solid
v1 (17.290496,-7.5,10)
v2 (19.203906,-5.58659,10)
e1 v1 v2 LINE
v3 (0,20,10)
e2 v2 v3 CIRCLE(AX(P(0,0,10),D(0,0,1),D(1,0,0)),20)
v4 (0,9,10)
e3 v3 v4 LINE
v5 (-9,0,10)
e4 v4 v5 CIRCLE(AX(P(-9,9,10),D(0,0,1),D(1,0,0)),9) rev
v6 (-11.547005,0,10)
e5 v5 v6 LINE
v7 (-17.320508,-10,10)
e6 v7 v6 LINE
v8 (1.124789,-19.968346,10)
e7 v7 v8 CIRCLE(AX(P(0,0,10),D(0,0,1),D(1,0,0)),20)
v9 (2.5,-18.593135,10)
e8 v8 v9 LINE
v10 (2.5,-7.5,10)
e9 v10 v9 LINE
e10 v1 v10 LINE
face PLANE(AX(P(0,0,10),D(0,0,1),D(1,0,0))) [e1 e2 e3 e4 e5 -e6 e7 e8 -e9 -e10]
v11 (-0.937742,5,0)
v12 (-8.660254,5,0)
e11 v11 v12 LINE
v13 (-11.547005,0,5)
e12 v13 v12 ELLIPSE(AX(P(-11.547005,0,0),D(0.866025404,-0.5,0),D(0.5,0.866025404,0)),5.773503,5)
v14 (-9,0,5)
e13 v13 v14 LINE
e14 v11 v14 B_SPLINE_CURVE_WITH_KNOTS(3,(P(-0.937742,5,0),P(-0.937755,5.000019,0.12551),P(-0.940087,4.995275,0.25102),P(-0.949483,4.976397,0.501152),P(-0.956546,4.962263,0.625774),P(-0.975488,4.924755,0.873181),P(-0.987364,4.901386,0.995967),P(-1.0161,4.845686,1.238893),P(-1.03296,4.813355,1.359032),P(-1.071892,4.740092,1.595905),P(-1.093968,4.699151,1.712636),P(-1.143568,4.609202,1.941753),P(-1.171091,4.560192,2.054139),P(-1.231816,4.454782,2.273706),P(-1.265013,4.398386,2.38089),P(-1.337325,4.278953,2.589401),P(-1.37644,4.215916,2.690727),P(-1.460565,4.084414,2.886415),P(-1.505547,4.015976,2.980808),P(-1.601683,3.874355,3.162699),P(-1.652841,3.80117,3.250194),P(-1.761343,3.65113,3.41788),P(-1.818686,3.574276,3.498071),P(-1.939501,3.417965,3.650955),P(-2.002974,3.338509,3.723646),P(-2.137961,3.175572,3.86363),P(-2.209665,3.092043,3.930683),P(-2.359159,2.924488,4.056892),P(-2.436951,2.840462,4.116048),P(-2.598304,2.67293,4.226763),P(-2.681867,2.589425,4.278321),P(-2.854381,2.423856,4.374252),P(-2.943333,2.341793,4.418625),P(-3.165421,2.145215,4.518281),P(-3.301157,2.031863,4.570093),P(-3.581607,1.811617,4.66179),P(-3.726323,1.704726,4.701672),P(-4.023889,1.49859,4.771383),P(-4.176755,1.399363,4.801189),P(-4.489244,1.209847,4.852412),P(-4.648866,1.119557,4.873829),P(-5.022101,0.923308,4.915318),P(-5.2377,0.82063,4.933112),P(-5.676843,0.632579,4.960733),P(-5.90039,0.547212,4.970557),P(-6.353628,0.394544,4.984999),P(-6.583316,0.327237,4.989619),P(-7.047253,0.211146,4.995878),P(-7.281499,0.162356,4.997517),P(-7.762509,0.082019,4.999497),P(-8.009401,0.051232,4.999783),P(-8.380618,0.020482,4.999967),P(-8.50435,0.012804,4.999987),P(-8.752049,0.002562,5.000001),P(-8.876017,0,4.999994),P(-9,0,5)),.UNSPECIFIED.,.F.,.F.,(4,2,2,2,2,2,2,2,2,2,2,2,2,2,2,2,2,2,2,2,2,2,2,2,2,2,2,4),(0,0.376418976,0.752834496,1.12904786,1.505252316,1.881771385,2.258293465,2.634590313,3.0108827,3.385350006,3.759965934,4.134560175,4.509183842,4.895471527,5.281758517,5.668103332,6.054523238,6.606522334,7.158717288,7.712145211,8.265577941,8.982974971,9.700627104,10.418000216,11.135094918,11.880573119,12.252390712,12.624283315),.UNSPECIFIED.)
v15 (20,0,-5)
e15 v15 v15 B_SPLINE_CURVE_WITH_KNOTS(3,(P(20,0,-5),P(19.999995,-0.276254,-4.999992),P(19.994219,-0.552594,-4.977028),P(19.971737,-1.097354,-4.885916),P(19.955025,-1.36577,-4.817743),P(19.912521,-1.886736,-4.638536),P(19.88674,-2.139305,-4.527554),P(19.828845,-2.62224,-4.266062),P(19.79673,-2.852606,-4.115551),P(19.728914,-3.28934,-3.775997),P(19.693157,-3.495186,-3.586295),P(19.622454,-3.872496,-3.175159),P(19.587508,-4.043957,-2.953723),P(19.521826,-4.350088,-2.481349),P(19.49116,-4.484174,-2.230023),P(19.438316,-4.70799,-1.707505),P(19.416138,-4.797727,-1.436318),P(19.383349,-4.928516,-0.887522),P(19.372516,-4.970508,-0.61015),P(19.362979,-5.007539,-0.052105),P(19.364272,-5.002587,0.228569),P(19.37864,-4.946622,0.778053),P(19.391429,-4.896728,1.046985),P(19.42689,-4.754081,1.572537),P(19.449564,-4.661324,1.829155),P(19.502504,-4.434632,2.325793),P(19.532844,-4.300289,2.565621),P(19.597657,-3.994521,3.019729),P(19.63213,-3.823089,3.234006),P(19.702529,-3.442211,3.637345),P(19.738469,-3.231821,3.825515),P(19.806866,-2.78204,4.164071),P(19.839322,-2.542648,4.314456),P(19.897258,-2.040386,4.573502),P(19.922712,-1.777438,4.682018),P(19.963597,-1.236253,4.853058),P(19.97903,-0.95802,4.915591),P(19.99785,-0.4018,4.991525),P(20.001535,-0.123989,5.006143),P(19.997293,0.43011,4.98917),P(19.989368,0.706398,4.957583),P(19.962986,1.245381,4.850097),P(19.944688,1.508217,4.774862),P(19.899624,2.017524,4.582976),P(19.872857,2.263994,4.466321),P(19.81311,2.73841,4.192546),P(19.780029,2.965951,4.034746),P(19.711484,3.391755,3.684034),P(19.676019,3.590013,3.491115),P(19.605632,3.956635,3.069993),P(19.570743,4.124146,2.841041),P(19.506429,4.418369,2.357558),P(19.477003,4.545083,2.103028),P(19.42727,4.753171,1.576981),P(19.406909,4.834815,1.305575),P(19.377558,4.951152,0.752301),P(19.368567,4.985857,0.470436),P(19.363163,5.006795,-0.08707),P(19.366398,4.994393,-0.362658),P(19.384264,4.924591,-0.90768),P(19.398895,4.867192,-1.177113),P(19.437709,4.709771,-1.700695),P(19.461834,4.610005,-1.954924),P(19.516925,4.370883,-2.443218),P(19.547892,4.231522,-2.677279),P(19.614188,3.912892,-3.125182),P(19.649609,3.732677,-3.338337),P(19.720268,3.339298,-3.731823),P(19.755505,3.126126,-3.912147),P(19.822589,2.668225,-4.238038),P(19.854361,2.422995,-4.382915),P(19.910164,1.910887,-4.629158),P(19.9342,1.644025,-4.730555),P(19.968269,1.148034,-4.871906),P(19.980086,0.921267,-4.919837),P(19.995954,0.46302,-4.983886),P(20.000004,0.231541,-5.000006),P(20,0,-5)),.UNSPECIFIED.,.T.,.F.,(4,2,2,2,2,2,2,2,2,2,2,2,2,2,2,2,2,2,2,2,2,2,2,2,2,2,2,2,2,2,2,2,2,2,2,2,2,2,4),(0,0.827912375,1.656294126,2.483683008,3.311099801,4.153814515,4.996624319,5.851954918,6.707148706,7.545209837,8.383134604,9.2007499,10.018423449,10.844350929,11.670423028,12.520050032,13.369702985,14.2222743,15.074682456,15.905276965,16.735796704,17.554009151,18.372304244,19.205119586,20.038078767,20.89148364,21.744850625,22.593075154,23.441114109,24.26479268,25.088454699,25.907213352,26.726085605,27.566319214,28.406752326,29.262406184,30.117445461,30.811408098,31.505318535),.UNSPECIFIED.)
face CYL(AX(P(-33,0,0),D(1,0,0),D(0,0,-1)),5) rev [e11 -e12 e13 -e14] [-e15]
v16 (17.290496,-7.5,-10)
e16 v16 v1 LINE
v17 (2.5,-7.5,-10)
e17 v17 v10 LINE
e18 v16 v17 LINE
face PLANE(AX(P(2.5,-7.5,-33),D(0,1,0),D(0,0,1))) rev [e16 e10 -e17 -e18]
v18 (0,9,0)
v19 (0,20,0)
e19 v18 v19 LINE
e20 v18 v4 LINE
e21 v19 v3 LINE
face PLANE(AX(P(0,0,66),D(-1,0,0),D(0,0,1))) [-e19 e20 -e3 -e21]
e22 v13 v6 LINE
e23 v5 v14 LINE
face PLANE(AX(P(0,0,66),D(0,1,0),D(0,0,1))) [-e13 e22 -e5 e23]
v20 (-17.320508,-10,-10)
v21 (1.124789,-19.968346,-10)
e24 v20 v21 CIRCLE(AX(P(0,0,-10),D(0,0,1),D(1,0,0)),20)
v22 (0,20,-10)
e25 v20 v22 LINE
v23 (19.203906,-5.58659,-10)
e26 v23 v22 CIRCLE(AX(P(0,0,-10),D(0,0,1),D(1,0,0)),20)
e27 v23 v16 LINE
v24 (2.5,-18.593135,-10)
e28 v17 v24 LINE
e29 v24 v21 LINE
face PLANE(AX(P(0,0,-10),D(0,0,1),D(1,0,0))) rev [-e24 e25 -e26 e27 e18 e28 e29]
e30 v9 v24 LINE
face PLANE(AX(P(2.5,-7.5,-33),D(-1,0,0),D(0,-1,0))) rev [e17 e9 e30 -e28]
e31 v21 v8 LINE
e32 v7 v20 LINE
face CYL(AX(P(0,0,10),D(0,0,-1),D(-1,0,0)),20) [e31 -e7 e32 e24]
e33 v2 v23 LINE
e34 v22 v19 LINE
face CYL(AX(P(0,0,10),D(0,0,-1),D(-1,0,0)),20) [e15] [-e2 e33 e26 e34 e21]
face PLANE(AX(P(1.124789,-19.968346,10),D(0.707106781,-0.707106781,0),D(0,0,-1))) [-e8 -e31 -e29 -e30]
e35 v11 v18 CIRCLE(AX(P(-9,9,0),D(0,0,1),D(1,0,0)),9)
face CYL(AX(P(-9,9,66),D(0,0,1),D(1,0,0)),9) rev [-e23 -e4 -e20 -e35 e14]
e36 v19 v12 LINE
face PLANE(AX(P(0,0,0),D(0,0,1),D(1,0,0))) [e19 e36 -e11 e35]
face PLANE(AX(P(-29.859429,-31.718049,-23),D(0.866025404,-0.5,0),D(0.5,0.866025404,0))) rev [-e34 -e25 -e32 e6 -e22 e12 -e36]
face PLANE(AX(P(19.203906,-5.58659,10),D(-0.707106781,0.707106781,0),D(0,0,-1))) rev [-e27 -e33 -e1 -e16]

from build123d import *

# Parameters (mm, degrees)
SKETCH1_R           = 20
BOSS_EXTRUDE1_DEPTH = 10
CUT_EXTRUDE1_DEPTH  = 33
SKETCH5_W           = 27.400462
SKETCH5_H           = 25.39372
CUT_EXTRUDE3_DEPTH  = 66
FILLET1_R           = 9
SKETCH6_W           = 26.303109
SKETCH6_H           = 19.36506
CUT_EXTRUDE4_DEPTH  = 33
CHAMFER1_SIZE       = 1.25
CHAMFER2_SIZE       = 1.25
SKETCH7_R           = 5
CUT_EXTRUDE5_DEPTH  = 33


with BuildPart() as part:
    # Sketch1 → Boss-Extrude1 (new, symmetric)
    with BuildSketch(Plane.XY):
        Circle(SKETCH1_R)
    extrude(amount=BOSS_EXTRUDE1_DEPTH, both=True)

    # Sketch2 → Cut-Extrude1 (cut, symmetric)
    with BuildSketch(Plane.XY.offset(10)):
        Polygon((0, 20), (0, 24.336587), (-29.859429, 24.336587), (-29.859429, -31.718049), align=None)
    extrude(amount=CUT_EXTRUDE1_DEPTH, both=True, mode=Mode.SUBTRACT)

    # Sketch5 → Cut-Extrude3 (cut)
    with BuildSketch(Plane.XY):
        with Locations((-13.700231, 12.69686)):
            Rectangle(SKETCH5_W, SKETCH5_H)
    extrude(amount=CUT_EXTRUDE3_DEPTH, mode=Mode.SUBTRACT)

    # Fillet1
    fillet1_edges = [part.edges().sort_by_distance(p)[0] for p in [
        (0, 0, 5),
    ]]
    fillet(fillet1_edges, radius=FILLET1_R)

    # Sketch6 → Cut-Extrude4 (cut, symmetric)
    with BuildSketch(Plane.XY):
        with Locations((15.651554, -17.18253)):
            Rectangle(SKETCH6_W, SKETCH6_H)
    extrude(amount=CUT_EXTRUDE4_DEPTH, both=True, mode=Mode.SUBTRACT)

    # Chamfer1
    # the kernel refuses this chamfer: 1.441493, 1.25 mm, written as the material it takes off along each edge
    with BuildSketch(Plane(origin=(2.5, -19.843135, -13.564195), x_dir=(0, 1, 0), z_dir=(0, 0, 1))) as chamfer1_piece_1:
        with BuildLine():
            Line((CHAMFER1_SIZE, 0), (-0.125211, 1.375211))
            ThreePointArc((-0.125211, 1.375211), (-0.076474, 0.708578), (0, 0))
            Line((0, 0), (CHAMFER1_SIZE, 0))
        make_face()
    extrude(amount=27.128391, mode=Mode.SUBTRACT)

    # Chamfer2
    # the kernel refuses this chamfer: 2.264391, 1.25 mm, written as the material it takes off along each edge
    with BuildSketch(Plane(origin=(18.540496, -7.5, -15.267547), x_dir=(0.32758486719281943, 0.944821758209591, 0), z_dir=(0, 0, 1))) as chamfer2_piece_1:
        with BuildLine():
            Line((2.025154, 0), (-CHAMFER2_SIZE * 0.327584867193, CHAMFER2_SIZE * 0.94482175821))
            Line((-CHAMFER2_SIZE * 0.327584867193, CHAMFER2_SIZE * 0.94482175821), (0, 0))
            ThreePointArc((0, 0), (1.053336, -0.025608), (2.025154, 0))
        make_face()
    extrude(amount=30.535093, mode=Mode.SUBTRACT)

    # Sketch7 → Cut-Extrude5 (cut, symmetric)
    with BuildSketch(Plane(origin=(0, 0, 0), x_dir=(0, 0, -1), z_dir=(1, 0, 0))):
        Circle(SKETCH7_R)
    extrude(amount=CUT_EXTRUDE5_DEPTH, both=True, mode=Mode.SUBTRACT)


solid = part.part
